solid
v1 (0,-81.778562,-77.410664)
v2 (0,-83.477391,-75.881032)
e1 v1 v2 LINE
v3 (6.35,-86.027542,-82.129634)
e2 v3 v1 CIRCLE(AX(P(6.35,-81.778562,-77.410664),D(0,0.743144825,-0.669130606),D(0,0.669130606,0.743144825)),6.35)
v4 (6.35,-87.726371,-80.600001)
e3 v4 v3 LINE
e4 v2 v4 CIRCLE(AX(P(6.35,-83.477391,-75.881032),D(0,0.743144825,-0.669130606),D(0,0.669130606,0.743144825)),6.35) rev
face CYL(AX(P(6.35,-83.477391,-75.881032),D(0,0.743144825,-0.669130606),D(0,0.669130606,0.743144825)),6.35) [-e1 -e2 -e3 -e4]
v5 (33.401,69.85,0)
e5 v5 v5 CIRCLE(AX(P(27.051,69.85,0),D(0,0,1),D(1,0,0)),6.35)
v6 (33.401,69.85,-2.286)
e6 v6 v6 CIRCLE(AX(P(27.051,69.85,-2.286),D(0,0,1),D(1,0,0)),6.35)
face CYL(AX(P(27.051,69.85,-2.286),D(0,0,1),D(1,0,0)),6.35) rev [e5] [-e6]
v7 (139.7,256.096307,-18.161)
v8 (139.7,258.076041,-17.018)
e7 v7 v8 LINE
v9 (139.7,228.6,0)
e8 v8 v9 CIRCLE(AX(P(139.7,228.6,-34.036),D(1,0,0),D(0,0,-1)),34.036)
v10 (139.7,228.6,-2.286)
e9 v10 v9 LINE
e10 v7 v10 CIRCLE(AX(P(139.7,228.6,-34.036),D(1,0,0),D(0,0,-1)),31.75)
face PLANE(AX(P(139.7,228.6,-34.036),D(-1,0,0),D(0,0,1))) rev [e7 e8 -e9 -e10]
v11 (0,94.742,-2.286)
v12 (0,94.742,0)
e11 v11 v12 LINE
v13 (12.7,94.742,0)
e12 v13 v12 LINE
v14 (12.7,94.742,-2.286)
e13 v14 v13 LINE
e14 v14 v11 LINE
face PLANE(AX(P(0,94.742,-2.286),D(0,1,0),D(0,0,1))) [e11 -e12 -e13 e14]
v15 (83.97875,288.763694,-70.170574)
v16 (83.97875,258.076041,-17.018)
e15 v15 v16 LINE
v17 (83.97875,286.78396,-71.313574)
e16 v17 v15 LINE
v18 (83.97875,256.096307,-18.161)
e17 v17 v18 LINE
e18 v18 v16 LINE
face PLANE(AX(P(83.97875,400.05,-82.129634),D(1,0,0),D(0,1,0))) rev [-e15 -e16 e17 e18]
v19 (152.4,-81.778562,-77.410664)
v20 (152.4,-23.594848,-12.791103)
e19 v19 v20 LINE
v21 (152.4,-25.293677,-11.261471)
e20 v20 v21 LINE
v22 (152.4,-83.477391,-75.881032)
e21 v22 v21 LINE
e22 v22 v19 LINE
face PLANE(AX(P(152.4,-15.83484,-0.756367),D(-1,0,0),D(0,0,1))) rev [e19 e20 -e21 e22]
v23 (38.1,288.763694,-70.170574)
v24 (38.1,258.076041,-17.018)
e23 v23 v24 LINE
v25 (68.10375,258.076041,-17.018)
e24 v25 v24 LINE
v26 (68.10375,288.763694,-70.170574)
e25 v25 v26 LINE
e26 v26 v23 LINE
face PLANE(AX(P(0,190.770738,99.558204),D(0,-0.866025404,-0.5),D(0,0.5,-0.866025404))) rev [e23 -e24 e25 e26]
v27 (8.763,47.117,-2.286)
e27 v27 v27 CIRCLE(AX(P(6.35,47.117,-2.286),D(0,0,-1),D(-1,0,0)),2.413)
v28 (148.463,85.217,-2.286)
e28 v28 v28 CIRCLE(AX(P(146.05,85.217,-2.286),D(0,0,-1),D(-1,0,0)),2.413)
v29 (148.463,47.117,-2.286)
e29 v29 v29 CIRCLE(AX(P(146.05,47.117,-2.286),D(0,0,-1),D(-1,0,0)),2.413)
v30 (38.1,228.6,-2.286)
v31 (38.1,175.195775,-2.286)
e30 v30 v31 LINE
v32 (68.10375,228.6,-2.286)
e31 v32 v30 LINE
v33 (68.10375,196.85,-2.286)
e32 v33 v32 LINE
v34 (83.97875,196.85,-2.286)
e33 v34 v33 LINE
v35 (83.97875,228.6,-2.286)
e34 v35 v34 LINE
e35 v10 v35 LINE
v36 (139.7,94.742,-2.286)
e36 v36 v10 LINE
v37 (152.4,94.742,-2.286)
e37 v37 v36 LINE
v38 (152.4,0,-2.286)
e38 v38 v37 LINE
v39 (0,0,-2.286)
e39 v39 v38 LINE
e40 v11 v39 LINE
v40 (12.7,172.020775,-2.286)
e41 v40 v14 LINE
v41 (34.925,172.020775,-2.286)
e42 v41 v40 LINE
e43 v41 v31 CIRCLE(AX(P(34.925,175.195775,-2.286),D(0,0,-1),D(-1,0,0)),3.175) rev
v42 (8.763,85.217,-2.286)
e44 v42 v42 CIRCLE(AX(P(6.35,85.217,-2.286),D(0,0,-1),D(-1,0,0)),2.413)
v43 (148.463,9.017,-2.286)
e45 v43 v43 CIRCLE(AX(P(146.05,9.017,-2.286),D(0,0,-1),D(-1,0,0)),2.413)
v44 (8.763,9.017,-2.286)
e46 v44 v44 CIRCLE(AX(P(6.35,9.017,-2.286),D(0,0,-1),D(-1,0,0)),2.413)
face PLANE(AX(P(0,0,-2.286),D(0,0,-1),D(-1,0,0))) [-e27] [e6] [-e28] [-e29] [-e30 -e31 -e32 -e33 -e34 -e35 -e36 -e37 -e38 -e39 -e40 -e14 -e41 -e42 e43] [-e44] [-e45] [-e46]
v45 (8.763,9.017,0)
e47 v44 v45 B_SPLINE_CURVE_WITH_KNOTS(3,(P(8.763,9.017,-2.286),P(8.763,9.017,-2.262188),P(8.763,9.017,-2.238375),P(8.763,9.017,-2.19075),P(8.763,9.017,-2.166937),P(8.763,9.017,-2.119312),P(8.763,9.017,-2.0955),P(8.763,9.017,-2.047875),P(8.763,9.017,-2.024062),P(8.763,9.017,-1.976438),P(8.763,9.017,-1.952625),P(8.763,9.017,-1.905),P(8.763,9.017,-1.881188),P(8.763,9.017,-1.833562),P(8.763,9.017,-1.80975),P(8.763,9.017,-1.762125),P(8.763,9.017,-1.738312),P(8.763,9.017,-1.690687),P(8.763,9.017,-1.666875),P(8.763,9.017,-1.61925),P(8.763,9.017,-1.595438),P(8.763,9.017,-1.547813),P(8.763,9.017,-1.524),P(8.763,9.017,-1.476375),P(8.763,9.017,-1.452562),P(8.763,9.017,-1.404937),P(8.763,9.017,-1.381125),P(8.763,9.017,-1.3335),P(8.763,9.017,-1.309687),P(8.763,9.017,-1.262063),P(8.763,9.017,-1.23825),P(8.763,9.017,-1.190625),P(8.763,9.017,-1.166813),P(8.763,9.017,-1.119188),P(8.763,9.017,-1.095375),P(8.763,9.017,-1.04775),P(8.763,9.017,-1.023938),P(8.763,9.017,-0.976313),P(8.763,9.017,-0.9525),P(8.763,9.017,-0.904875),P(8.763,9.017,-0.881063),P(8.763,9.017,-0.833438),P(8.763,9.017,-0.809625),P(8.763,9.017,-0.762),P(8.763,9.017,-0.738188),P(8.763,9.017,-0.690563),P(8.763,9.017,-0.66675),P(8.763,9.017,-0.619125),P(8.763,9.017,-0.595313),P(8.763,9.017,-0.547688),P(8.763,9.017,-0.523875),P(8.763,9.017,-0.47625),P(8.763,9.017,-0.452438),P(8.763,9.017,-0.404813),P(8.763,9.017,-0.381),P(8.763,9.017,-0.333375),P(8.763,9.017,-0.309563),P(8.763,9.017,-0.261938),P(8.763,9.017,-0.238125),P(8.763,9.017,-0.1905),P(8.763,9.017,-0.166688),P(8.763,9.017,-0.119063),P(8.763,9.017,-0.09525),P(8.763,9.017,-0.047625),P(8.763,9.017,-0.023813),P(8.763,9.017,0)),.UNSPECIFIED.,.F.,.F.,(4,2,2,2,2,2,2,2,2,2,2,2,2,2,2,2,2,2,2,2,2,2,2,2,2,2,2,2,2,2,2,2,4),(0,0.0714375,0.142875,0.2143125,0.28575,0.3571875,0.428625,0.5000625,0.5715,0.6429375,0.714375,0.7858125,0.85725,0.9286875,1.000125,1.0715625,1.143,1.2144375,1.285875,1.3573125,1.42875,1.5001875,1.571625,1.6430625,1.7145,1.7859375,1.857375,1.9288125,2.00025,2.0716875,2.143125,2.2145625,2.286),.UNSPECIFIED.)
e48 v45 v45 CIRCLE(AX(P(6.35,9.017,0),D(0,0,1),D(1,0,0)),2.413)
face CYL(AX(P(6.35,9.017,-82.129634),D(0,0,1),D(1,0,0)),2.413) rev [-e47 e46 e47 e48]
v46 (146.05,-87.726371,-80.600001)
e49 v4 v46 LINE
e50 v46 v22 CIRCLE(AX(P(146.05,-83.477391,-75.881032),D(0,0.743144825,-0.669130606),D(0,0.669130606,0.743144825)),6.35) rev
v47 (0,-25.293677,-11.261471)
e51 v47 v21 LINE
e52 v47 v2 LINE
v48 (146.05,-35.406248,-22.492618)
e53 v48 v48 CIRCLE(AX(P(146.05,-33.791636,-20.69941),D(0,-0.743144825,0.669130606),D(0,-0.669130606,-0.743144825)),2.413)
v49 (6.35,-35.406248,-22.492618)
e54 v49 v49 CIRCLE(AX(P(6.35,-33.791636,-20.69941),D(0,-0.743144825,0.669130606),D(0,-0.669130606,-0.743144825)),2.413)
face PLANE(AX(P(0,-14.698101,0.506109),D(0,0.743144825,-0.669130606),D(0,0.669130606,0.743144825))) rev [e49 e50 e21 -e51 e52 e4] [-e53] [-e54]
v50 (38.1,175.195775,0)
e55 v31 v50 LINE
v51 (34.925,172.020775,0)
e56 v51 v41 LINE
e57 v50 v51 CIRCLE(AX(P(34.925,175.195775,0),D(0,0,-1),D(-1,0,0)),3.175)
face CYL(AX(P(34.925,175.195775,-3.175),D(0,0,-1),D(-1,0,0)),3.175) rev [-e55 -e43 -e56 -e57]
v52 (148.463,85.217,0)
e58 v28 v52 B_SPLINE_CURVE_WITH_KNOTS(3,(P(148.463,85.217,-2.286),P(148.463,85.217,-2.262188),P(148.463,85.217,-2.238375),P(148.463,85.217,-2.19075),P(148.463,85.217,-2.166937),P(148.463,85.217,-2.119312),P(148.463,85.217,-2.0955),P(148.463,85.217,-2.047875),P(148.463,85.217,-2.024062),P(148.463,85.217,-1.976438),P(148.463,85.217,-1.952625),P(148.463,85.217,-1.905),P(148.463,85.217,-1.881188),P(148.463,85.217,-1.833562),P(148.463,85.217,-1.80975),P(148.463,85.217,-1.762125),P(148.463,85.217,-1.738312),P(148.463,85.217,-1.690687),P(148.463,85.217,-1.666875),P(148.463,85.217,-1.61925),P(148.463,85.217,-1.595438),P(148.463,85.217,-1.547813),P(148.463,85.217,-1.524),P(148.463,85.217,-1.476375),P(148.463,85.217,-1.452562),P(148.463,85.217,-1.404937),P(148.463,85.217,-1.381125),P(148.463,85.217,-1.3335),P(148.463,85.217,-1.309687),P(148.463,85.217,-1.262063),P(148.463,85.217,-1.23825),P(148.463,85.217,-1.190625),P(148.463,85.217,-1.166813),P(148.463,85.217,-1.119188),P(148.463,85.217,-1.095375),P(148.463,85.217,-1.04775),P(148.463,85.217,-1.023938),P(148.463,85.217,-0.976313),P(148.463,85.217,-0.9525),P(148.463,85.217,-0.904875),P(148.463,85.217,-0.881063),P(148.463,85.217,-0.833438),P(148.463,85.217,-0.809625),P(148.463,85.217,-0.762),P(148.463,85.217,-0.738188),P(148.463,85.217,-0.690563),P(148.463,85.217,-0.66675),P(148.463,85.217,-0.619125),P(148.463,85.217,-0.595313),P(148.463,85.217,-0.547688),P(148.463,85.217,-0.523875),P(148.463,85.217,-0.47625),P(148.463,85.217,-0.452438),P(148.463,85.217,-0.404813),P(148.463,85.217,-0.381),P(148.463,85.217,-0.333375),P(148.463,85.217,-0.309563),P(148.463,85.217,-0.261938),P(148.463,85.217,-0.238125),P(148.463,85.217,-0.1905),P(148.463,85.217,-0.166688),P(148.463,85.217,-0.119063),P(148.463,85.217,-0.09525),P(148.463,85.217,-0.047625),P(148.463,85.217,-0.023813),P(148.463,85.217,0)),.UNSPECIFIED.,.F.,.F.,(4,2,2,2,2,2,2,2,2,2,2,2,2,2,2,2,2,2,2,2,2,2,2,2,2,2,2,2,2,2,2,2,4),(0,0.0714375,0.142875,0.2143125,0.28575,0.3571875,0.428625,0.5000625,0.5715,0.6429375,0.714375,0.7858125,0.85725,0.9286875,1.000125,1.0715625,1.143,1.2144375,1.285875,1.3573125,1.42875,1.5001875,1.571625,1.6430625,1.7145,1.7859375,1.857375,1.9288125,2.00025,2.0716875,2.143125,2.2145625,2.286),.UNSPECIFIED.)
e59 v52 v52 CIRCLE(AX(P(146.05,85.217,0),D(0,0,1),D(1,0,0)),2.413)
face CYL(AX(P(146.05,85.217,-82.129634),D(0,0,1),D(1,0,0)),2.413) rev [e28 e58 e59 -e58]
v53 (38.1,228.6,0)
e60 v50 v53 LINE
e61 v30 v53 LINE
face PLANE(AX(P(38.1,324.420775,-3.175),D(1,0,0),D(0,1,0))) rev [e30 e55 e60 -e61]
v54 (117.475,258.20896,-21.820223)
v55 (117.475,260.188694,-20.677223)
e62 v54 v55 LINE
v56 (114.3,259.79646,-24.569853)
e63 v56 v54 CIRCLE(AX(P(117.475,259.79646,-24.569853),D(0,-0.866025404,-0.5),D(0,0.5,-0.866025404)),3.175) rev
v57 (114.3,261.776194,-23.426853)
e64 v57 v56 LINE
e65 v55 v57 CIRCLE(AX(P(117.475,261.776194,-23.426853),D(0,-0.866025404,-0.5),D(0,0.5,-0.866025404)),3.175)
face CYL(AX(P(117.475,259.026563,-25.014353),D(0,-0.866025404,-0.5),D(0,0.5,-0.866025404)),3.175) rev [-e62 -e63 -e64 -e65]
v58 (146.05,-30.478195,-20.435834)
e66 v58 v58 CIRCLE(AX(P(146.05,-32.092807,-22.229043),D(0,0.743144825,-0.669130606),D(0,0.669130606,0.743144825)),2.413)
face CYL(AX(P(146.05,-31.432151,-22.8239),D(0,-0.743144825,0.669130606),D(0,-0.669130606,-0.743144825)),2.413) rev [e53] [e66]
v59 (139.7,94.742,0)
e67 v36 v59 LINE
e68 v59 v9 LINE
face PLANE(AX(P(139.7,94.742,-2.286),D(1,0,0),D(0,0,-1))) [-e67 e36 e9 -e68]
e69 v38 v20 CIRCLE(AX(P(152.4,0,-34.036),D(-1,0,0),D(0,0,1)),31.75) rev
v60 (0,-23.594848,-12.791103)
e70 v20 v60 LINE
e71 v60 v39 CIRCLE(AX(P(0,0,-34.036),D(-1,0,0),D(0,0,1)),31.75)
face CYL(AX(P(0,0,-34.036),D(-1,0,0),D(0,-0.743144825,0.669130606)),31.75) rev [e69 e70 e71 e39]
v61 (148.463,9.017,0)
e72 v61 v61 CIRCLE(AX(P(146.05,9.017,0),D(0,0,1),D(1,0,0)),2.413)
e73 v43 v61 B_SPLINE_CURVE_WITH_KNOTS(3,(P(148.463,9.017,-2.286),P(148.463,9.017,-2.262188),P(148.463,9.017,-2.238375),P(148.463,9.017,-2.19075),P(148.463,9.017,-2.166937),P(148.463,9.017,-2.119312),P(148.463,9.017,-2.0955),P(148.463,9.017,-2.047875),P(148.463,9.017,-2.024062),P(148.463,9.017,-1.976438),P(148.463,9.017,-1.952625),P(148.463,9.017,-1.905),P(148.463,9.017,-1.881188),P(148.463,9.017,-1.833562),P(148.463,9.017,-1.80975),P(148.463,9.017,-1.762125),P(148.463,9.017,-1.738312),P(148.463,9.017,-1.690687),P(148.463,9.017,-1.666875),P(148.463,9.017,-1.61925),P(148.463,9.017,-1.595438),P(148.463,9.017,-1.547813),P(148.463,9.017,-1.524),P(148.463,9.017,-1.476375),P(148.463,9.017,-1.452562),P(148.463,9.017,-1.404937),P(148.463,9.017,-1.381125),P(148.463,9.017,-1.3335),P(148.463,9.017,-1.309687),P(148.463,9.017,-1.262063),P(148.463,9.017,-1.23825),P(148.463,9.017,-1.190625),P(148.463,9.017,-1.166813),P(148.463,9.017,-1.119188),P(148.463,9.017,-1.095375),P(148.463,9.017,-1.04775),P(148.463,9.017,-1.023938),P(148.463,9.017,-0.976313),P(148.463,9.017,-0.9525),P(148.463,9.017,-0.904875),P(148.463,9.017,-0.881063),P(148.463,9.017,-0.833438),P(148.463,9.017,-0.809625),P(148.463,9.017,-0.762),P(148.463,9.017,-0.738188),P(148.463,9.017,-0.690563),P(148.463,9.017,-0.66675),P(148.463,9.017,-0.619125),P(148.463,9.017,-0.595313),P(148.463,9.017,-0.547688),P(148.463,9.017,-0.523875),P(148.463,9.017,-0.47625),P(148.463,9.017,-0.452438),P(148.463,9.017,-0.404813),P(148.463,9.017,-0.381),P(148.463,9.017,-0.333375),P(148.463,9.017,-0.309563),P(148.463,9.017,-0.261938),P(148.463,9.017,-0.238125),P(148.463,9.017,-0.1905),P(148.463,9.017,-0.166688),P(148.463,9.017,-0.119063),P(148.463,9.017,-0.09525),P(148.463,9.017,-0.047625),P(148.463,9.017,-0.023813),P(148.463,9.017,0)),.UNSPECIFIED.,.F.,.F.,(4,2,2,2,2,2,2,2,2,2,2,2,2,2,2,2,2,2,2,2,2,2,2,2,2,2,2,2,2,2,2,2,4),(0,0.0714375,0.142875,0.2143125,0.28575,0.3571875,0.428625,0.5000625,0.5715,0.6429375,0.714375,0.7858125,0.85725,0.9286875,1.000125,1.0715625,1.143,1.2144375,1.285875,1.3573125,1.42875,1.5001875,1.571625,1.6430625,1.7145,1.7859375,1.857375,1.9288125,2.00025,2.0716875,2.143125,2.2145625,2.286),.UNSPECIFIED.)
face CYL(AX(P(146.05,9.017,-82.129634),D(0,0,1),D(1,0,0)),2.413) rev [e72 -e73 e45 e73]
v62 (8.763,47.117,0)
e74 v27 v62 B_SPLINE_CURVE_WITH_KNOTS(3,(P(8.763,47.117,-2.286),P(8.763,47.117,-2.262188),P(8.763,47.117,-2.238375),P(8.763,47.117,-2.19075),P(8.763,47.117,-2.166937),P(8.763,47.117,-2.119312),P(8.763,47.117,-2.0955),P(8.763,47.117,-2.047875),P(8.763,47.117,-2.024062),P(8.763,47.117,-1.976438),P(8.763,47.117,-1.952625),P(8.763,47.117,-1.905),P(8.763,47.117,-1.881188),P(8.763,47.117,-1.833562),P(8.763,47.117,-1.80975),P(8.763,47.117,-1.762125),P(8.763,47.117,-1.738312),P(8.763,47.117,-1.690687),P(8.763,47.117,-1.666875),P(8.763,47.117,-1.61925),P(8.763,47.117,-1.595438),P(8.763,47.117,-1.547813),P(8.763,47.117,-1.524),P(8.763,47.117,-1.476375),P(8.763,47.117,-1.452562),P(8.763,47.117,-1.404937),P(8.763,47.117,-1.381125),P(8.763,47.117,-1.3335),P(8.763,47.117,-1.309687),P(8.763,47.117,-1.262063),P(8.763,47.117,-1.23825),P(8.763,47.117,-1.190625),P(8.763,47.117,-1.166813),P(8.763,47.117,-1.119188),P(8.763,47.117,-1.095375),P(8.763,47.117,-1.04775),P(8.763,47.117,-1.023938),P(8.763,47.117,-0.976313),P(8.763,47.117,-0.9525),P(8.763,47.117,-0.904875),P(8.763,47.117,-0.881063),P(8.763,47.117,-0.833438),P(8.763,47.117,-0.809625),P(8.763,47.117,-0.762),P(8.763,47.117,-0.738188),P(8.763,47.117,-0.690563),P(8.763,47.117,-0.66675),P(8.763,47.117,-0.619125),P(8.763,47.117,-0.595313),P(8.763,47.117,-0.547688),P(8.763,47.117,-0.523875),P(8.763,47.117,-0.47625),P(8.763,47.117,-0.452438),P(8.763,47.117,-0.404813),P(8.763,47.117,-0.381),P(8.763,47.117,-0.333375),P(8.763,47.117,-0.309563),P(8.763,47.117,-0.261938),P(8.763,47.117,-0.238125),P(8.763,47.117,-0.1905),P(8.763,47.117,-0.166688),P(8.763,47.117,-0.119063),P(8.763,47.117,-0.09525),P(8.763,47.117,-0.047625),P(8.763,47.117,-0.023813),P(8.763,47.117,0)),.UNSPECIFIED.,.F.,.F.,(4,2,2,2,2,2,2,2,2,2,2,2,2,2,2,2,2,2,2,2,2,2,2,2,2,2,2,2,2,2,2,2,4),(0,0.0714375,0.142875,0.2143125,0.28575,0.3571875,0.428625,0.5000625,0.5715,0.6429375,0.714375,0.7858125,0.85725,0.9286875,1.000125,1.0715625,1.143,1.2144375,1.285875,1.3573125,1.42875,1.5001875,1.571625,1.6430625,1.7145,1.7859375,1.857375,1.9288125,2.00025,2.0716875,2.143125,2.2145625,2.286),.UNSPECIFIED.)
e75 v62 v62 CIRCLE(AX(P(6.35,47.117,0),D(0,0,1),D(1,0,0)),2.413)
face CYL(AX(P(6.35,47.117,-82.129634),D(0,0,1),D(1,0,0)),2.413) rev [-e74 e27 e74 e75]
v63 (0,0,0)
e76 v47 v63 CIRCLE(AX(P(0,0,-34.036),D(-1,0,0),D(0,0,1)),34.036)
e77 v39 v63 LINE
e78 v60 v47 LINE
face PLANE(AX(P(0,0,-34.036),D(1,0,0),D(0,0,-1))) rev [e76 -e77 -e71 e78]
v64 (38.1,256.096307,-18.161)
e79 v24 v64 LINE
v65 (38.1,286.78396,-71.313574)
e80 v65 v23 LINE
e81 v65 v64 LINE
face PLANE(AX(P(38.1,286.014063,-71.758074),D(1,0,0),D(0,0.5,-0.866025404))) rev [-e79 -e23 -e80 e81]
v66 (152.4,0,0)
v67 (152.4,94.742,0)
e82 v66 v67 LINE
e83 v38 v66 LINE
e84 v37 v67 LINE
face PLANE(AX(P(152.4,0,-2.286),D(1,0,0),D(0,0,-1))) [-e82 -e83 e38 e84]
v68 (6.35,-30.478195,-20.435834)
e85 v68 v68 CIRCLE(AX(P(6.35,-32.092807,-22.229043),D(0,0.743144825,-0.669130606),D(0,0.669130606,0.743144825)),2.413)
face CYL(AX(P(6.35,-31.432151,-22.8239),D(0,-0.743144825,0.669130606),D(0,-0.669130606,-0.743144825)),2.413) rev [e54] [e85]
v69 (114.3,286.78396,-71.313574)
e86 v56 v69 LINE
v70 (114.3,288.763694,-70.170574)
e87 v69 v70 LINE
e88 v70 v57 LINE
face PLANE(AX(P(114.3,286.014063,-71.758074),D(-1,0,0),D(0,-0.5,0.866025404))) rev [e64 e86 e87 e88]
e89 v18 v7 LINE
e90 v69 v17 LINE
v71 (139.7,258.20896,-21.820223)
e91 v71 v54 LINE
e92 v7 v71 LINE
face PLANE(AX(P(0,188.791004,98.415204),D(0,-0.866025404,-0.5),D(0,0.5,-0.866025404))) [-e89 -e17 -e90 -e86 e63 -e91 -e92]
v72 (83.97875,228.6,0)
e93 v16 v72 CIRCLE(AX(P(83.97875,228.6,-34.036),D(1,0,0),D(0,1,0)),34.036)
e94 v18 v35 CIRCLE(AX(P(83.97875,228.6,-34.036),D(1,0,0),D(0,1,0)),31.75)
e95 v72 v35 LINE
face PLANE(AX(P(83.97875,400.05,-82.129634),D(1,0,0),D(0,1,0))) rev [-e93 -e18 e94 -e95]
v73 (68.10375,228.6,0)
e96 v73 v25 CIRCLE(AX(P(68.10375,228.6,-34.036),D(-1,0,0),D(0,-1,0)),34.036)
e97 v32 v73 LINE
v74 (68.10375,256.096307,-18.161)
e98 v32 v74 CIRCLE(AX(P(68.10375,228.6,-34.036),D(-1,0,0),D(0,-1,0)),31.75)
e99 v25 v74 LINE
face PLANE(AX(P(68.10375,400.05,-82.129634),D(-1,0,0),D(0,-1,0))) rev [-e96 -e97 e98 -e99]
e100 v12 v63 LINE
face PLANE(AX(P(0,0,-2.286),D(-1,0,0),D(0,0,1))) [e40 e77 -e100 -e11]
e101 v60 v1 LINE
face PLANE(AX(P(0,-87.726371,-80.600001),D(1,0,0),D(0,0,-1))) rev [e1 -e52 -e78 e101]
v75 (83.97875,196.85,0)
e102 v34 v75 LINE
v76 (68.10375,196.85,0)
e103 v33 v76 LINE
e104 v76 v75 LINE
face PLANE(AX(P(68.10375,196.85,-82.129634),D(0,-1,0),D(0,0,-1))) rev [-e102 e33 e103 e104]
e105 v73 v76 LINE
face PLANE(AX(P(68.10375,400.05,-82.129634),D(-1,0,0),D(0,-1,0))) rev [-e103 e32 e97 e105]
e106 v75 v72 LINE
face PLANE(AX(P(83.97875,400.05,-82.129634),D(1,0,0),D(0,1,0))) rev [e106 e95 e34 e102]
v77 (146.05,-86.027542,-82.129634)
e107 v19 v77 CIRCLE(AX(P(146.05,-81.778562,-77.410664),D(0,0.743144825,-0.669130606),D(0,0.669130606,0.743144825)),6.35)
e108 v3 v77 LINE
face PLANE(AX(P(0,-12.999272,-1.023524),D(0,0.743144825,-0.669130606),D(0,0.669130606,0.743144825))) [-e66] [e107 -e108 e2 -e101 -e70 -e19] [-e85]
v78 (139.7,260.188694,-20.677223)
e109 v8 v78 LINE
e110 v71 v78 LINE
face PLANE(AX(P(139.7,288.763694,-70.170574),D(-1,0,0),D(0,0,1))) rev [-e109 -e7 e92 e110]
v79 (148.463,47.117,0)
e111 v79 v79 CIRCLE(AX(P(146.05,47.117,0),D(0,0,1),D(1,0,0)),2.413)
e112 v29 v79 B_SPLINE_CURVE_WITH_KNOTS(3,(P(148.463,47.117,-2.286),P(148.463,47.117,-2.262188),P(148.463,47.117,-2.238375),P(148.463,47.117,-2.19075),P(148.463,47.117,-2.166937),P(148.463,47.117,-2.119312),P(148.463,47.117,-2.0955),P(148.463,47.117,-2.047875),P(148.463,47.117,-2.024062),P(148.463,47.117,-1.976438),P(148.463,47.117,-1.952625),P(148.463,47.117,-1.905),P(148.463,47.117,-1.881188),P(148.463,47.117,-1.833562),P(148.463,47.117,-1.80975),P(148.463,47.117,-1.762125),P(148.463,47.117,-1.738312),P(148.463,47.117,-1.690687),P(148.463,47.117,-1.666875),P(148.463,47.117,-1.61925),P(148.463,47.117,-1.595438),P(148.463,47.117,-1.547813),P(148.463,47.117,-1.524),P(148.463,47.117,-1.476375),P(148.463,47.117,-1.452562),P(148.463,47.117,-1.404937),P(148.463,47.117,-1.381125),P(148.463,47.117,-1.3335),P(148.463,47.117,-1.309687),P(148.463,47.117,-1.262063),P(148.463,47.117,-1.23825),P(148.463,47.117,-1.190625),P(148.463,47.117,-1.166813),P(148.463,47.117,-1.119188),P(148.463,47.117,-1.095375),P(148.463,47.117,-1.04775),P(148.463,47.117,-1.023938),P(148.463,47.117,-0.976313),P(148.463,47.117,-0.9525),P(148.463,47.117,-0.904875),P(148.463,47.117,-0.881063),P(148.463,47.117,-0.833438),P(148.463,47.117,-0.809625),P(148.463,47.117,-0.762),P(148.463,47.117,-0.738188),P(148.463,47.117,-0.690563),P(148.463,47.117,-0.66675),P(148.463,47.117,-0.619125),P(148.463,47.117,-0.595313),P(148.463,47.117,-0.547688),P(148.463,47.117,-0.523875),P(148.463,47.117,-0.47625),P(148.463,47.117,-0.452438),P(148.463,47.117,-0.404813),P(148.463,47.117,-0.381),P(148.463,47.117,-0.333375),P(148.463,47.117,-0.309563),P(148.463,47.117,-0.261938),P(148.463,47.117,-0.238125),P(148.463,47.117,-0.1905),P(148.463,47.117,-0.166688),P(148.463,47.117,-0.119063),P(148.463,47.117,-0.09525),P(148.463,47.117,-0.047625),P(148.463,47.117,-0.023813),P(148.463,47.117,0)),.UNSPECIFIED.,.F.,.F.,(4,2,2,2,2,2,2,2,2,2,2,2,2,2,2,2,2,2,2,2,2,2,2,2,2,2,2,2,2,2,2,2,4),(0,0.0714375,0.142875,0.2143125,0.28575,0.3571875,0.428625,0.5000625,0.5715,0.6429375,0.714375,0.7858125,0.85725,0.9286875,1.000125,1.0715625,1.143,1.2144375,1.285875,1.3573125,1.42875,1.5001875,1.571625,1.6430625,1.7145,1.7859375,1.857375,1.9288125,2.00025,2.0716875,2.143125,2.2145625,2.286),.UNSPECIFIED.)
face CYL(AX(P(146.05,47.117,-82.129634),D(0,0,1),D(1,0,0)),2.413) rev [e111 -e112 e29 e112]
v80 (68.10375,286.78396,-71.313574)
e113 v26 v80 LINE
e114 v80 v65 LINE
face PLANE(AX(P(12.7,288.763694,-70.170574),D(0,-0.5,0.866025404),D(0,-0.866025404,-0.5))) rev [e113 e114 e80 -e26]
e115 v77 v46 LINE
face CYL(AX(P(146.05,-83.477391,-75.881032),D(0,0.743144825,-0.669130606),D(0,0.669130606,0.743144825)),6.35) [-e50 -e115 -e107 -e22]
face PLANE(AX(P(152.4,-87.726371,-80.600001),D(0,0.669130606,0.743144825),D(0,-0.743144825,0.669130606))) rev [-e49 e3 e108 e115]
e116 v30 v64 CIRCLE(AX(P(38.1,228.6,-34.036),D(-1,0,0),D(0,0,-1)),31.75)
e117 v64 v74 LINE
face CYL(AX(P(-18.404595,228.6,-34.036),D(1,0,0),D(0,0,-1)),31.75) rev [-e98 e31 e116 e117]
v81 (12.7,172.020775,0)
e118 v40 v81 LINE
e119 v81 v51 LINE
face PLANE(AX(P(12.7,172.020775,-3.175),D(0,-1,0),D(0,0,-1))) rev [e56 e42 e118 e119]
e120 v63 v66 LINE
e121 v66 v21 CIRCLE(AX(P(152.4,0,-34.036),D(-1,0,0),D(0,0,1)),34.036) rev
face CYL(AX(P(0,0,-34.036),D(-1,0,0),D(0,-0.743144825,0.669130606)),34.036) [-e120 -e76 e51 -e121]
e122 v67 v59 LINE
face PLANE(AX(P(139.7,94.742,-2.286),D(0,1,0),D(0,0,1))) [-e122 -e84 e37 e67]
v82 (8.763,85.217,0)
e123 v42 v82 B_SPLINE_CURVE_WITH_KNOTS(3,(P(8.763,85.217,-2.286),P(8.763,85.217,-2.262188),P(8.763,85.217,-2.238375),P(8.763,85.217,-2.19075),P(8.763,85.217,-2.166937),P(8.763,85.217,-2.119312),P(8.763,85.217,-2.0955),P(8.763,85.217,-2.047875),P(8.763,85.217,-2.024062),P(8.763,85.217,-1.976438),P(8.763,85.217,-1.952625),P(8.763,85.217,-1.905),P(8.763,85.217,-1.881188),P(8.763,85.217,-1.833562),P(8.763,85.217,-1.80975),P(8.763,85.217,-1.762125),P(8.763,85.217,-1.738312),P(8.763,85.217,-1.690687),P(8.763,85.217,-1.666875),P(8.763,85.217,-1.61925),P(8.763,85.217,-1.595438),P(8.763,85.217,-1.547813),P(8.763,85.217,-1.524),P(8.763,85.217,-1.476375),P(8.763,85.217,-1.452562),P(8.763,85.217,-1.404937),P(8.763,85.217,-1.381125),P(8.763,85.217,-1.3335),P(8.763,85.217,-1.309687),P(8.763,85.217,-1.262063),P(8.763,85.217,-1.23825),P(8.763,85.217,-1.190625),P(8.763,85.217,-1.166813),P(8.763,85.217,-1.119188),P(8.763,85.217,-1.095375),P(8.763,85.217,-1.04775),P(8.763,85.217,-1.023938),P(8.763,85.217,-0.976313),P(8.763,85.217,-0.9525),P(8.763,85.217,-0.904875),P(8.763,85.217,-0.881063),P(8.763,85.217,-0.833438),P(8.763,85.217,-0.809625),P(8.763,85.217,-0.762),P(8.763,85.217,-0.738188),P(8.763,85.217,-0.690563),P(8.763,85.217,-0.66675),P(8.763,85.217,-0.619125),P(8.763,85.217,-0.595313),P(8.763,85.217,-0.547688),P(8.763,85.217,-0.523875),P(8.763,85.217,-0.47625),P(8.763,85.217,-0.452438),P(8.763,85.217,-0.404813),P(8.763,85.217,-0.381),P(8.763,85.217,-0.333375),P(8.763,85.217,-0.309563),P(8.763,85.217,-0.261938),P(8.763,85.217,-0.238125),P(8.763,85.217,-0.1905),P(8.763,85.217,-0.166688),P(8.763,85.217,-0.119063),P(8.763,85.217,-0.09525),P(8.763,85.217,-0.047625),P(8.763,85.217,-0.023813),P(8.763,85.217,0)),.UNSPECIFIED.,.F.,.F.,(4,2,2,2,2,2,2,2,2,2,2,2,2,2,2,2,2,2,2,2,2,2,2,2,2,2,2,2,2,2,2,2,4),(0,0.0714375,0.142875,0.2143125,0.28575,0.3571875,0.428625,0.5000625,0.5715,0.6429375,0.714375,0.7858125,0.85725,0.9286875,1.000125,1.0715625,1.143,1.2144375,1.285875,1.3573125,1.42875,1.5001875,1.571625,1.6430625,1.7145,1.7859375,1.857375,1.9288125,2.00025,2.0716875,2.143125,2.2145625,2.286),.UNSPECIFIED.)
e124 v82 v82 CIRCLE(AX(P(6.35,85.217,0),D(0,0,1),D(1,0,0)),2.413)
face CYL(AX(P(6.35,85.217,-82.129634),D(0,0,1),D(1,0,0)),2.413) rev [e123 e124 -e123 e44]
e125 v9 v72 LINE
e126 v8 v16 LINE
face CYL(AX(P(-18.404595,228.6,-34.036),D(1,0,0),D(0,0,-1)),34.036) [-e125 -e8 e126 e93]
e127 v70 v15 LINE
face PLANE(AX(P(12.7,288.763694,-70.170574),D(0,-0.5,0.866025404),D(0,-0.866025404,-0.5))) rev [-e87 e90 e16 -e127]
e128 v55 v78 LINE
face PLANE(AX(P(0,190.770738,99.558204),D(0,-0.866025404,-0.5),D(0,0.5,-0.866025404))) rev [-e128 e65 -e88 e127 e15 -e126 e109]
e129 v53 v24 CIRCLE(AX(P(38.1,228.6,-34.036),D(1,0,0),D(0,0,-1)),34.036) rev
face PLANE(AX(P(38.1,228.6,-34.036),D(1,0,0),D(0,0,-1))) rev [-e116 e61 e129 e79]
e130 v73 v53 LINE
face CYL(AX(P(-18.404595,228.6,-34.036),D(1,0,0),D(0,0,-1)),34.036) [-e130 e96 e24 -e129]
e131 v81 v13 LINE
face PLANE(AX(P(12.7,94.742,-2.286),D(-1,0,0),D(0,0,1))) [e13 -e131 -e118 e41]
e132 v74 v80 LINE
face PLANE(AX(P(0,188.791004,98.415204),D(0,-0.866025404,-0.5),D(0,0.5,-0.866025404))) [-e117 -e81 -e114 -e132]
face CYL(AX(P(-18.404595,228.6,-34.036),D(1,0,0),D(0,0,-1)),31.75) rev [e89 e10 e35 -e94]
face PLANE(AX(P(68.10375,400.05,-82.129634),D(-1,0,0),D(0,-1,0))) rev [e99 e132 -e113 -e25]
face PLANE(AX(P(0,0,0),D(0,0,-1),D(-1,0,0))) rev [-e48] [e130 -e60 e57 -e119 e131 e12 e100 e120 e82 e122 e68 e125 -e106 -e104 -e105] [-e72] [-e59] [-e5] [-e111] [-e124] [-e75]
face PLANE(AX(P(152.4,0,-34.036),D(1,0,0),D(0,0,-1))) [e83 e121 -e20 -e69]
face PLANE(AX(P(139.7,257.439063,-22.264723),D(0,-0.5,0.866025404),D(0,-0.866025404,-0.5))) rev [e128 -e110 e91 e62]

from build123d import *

# Parameters (mm, degrees)
BASE_FLANGE1_DEPTH = 2.286
SKETCH6_R          = 6.35
CUT_EXTRUDE1_DEPTH = 275.752517361
EDGE_FLANGE1_DEPTH = 152.4
FILLET1_R          = 6.35
EDGE_FLANGE2_DEPTH = 127
UNFOLD1_START      = 12.7
UNFOLD1_DEPTH      = 127
UNFOLD1_2_DEPTH    = 127
SKETCH15_W         = 25.4
SKETCH15_H         = 152.4
SKETCH15_H_2       = 57.15
CUT_EXTRUDE2_DEPTH = 2.54
FOLD1_START        = 38.1
FOLD1_DEPTH        = 101.6
FOLD1_2_DEPTH      = 76.2
FOLD1_START_2      = 114.3
FOLD1_3_DEPTH      = 25.4
FILLET2_R          = 3.175
SKETCH16_W         = 15.875
SKETCH16_H         = 203.2
CUT_EXTRUDE3_DEPTH = 337.68309673
SKETCH17_R         = 2.413
CUT_EXTRUDE4_DEPTH = 337.68309673
SKETCH18_R         = 2.413
CUT_EXTRUDE5_DEPTH = 2.54


# Read off the part's stored shape, not the designer's step: Unfold1, Fold1
# Sheet-metal steps are written as plain solids
with BuildPart() as part:
    # Sketch1 → Base-Flange1 (new body)
    with BuildSketch(Plane.XY):
        Polygon((139.7, 94.742), (152.4, 94.742), (152.4, 0), (0, 0), (0, 94.742), (12.7, 94.742), (12.7, 228.6), (139.7, 228.6), align=None)
    extrude(amount=-BASE_FLANGE1_DEPTH)

    # Sketch6 → Cut-Extrude1 (cut, through all)
    with BuildSketch(Plane.XY):
        with Locations((27.051, 69.85)):
            Circle(SKETCH6_R)
    extrude(amount=-CUT_EXTRUDE1_DEPTH, mode=Mode.SUBTRACT)

    # Edge-Flange1 section (across the edge) → Edge-Flange1 (add)
    with BuildSketch(Plane(origin=(152.4, -14.136010759, -2.286), x_dir=(0, 0.7431448254773909, -0.6691306063588619), z_dir=(-1, 0, 0))):
        with BuildLine():
            Line((-2.286, 14.136010759), (-2.286, 107.440207225))
            Line((-2.286, 107.440207225), (0, 107.440207225))
            Line((0, 107.440207225), (0, 14.136010759))
            ThreePointArc((0, 14.136010759), (2.74493172, 1.222122341), (10.505103248, -9.45883745))
            Line((10.505103248, -9.45883745), (8.975470682, -11.157666521))
            ThreePointArc((8.975470682, -11.157666521), (0.656566804, 0.292322375), (-2.286, 14.136010759))
        make_face()
    extrude(amount=EDGE_FLANGE1_DEPTH)

    # Fillet1
    fillet1_edges = [part.edges().sort_by_distance(p)[0] for p in [
        (152.4, -86.876956302, -81.364817765),
        (0, -86.876956302, -81.364817765),
    ]]
    fillet(fillet1_edges, radius=FILLET1_R)

    # Edge-Flange2 section (across the edge) → Edge-Flange2 (add)
    with BuildSketch(Plane(origin=(12.7, 246.930871047, -2.286), x_dir=(0, -0.8660254037844364, -0.5000000000000041), z_dir=(1, 0, 0))):
        with BuildLine():
            Line((-2.286, 18.330871047), (-2.286, 79.706177285))
            Line((-2.286, 79.706177285), (0, 79.706177285))
            Line((0, 79.706177285), (0, 18.330871047))
            ThreePointArc((0, 18.330871047), (4.25369343, 2.455871047), (15.875, -9.165435523))
            Line((15.875, -9.165435523), (14.732, -11.145169596))
            ThreePointArc((14.732, -11.145169596), (2.273959357, 1.312871047), (-2.286, 18.330871047))
        make_face()
    extrude(amount=EDGE_FLANGE2_DEPTH)

    # Unfold1 outline → Unfold1 (cut)
    with BuildSketch(Plane.YZ.offset(UNFOLD1_START)):
        with BuildLine():
            Line((240.863229427, -2.286), (228.6, -2.286))
            ThreePointArc((228.6, -2.286), (244.475, -6.53969343), (256.09630657, -18.161))
            Line((256.09630657, -18.161), (286.783959689, -71.313574367))
            Line((286.783959689, -71.313574367), (288.763693762, -70.170574367))
            Line((288.763693762, -70.170574367), (258.076040643, -17.018))
            ThreePointArc((258.076040643, -17.018), (250.731417092, -8.177738777), (240.863229427, -2.286))
        make_face()
    extrude(amount=UNFOLD1_DEPTH, mode=Mode.SUBTRACT)

    # Unfold1 2 outline → Unfold1 2 (add)
    with BuildSketch(Plane.YZ.offset(UNFOLD1_START)):
        with BuildLine():
            ThreePointArc((228.6, 0), (234.837238812, -0.576380337), (240.863229427, -2.286))
            Line((240.863229427, -2.286), (324.420775289, -2.286))
            Line((324.420775289, -2.286), (324.420775289, 0))
            Line((324.420775289, 0), (228.6, 0))
        make_face()
    extrude(amount=UNFOLD1_2_DEPTH)

    # Sketch15 → Cut-Extrude2 (cut)
    with BuildSketch(Plane.XY):
        with Locations((25.4, 248.220775289)):
            Rectangle(SKETCH15_W, SKETCH15_H)
        with Locations((127, 295.845775289)):
            Rectangle(SKETCH15_W, SKETCH15_H_2)
    extrude(amount=-CUT_EXTRUDE2_DEPTH, mode=Mode.SUBTRACT)

    # Fold1 outline → Fold1 (cut)
    with BuildSketch(Plane.YZ.offset(FOLD1_START)):
        with BuildLine():
            ThreePointArc((228.6, 0), (234.837238812, -0.576380337), (240.863229427, -2.286))
            Line((240.863229427, -2.286), (324.420775289, -2.286))
            Line((324.420775289, -2.286), (324.420775289, 0))
            Line((324.420775289, 0), (228.6, 0))
        make_face()
    extrude(amount=FOLD1_DEPTH, mode=Mode.SUBTRACT)

    # Fold1 2 outline → Fold1 2 (add)
    with BuildSketch(Plane.YZ.offset(FOLD1_START)):
        with BuildLine():
            ThreePointArc((228.6, -2.286), (244.475, -6.53969343), (256.09630657, -18.161))
            Line((256.09630657, -18.161), (286.783959689, -71.313574367))
            Line((286.783959689, -71.313574367), (288.763693762, -70.170574367))
            Line((288.763693762, -70.170574367), (258.076040643, -17.018))
            ThreePointArc((258.076040643, -17.018), (250.731417092, -8.177738777), (240.863229427, -2.286))
            Line((240.863229427, -2.286), (228.6, -2.286))
        make_face()
    extrude(amount=FOLD1_2_DEPTH)

    # Fold1 3 outline → Fold1 3 (add)
    with BuildSketch(Plane.YZ.offset(FOLD1_START_2)):
        with BuildLine():
            ThreePointArc((228.6, -2.286), (244.475, -6.53969343), (256.09630657, -18.161))
            Line((256.09630657, -18.161), (258.208959689, -21.820222541))
            Line((258.208959689, -21.820222541), (260.188693762, -20.677222541))
            Line((260.188693762, -20.677222541), (258.076040643, -17.018))
            ThreePointArc((258.076040643, -17.018), (250.731417092, -8.177738777), (240.863229427, -2.286))
            Line((240.863229427, -2.286), (228.6, -2.286))
        make_face()
    extrude(amount=FOLD1_3_DEPTH)

    # Fillet2
    fillet2_edges = [part.edges().sort_by_distance(p)[0] for p in [
        (38.1, 172.020775289, -1.143),
        (114.3, 259.198826725, -21.248722541),
    ]]
    fillet(fillet2_edges, radius=FILLET2_R)

    # Sketch16 → Cut-Extrude3 (cut, through all)
    with BuildSketch(Plane.XY):
        with Locations((76.04125, 298.45)):
            Rectangle(SKETCH16_W, SKETCH16_H)
    extrude(amount=-CUT_EXTRUDE3_DEPTH, mode=Mode.SUBTRACT)

    # Sketch17 → Cut-Extrude4 (cut, through all)
    with BuildSketch(Plane.XY):
        with Locations((6.35, 85.217)):
            Circle(SKETCH17_R)
        with Locations((6.35, 47.117)):
            Circle(SKETCH17_R)
        with Locations((6.35, 9.017)):
            Circle(SKETCH17_R)
        with Locations((146.05, 47.117)):
            Circle(SKETCH17_R)
        with Locations((146.05, 9.017)):
            Circle(SKETCH17_R)
        with Locations((146.05, 85.217)):
            Circle(SKETCH17_R)
    extrude(amount=-CUT_EXTRUDE4_DEPTH, mode=Mode.SUBTRACT)

    # Sketch18 → Cut-Extrude5 (cut)
    with BuildSketch(Plane(origin=(0, -8.368903665, 7.535394706), x_dir=(1, 0, 0), z_dir=(0, -0.7431448254773909, 0.6691306063588619))):
        with Locations(Location((6.35, -37.99367728, 0), (0, 0, 270))):
            Circle(SKETCH18_R)
        with Locations(Location((146.05, -37.99367728, 0), (0, 0, 270))):
            Circle(SKETCH18_R)
    extrude(amount=-CUT_EXTRUDE5_DEPTH, mode=Mode.SUBTRACT)


solid = part.part
